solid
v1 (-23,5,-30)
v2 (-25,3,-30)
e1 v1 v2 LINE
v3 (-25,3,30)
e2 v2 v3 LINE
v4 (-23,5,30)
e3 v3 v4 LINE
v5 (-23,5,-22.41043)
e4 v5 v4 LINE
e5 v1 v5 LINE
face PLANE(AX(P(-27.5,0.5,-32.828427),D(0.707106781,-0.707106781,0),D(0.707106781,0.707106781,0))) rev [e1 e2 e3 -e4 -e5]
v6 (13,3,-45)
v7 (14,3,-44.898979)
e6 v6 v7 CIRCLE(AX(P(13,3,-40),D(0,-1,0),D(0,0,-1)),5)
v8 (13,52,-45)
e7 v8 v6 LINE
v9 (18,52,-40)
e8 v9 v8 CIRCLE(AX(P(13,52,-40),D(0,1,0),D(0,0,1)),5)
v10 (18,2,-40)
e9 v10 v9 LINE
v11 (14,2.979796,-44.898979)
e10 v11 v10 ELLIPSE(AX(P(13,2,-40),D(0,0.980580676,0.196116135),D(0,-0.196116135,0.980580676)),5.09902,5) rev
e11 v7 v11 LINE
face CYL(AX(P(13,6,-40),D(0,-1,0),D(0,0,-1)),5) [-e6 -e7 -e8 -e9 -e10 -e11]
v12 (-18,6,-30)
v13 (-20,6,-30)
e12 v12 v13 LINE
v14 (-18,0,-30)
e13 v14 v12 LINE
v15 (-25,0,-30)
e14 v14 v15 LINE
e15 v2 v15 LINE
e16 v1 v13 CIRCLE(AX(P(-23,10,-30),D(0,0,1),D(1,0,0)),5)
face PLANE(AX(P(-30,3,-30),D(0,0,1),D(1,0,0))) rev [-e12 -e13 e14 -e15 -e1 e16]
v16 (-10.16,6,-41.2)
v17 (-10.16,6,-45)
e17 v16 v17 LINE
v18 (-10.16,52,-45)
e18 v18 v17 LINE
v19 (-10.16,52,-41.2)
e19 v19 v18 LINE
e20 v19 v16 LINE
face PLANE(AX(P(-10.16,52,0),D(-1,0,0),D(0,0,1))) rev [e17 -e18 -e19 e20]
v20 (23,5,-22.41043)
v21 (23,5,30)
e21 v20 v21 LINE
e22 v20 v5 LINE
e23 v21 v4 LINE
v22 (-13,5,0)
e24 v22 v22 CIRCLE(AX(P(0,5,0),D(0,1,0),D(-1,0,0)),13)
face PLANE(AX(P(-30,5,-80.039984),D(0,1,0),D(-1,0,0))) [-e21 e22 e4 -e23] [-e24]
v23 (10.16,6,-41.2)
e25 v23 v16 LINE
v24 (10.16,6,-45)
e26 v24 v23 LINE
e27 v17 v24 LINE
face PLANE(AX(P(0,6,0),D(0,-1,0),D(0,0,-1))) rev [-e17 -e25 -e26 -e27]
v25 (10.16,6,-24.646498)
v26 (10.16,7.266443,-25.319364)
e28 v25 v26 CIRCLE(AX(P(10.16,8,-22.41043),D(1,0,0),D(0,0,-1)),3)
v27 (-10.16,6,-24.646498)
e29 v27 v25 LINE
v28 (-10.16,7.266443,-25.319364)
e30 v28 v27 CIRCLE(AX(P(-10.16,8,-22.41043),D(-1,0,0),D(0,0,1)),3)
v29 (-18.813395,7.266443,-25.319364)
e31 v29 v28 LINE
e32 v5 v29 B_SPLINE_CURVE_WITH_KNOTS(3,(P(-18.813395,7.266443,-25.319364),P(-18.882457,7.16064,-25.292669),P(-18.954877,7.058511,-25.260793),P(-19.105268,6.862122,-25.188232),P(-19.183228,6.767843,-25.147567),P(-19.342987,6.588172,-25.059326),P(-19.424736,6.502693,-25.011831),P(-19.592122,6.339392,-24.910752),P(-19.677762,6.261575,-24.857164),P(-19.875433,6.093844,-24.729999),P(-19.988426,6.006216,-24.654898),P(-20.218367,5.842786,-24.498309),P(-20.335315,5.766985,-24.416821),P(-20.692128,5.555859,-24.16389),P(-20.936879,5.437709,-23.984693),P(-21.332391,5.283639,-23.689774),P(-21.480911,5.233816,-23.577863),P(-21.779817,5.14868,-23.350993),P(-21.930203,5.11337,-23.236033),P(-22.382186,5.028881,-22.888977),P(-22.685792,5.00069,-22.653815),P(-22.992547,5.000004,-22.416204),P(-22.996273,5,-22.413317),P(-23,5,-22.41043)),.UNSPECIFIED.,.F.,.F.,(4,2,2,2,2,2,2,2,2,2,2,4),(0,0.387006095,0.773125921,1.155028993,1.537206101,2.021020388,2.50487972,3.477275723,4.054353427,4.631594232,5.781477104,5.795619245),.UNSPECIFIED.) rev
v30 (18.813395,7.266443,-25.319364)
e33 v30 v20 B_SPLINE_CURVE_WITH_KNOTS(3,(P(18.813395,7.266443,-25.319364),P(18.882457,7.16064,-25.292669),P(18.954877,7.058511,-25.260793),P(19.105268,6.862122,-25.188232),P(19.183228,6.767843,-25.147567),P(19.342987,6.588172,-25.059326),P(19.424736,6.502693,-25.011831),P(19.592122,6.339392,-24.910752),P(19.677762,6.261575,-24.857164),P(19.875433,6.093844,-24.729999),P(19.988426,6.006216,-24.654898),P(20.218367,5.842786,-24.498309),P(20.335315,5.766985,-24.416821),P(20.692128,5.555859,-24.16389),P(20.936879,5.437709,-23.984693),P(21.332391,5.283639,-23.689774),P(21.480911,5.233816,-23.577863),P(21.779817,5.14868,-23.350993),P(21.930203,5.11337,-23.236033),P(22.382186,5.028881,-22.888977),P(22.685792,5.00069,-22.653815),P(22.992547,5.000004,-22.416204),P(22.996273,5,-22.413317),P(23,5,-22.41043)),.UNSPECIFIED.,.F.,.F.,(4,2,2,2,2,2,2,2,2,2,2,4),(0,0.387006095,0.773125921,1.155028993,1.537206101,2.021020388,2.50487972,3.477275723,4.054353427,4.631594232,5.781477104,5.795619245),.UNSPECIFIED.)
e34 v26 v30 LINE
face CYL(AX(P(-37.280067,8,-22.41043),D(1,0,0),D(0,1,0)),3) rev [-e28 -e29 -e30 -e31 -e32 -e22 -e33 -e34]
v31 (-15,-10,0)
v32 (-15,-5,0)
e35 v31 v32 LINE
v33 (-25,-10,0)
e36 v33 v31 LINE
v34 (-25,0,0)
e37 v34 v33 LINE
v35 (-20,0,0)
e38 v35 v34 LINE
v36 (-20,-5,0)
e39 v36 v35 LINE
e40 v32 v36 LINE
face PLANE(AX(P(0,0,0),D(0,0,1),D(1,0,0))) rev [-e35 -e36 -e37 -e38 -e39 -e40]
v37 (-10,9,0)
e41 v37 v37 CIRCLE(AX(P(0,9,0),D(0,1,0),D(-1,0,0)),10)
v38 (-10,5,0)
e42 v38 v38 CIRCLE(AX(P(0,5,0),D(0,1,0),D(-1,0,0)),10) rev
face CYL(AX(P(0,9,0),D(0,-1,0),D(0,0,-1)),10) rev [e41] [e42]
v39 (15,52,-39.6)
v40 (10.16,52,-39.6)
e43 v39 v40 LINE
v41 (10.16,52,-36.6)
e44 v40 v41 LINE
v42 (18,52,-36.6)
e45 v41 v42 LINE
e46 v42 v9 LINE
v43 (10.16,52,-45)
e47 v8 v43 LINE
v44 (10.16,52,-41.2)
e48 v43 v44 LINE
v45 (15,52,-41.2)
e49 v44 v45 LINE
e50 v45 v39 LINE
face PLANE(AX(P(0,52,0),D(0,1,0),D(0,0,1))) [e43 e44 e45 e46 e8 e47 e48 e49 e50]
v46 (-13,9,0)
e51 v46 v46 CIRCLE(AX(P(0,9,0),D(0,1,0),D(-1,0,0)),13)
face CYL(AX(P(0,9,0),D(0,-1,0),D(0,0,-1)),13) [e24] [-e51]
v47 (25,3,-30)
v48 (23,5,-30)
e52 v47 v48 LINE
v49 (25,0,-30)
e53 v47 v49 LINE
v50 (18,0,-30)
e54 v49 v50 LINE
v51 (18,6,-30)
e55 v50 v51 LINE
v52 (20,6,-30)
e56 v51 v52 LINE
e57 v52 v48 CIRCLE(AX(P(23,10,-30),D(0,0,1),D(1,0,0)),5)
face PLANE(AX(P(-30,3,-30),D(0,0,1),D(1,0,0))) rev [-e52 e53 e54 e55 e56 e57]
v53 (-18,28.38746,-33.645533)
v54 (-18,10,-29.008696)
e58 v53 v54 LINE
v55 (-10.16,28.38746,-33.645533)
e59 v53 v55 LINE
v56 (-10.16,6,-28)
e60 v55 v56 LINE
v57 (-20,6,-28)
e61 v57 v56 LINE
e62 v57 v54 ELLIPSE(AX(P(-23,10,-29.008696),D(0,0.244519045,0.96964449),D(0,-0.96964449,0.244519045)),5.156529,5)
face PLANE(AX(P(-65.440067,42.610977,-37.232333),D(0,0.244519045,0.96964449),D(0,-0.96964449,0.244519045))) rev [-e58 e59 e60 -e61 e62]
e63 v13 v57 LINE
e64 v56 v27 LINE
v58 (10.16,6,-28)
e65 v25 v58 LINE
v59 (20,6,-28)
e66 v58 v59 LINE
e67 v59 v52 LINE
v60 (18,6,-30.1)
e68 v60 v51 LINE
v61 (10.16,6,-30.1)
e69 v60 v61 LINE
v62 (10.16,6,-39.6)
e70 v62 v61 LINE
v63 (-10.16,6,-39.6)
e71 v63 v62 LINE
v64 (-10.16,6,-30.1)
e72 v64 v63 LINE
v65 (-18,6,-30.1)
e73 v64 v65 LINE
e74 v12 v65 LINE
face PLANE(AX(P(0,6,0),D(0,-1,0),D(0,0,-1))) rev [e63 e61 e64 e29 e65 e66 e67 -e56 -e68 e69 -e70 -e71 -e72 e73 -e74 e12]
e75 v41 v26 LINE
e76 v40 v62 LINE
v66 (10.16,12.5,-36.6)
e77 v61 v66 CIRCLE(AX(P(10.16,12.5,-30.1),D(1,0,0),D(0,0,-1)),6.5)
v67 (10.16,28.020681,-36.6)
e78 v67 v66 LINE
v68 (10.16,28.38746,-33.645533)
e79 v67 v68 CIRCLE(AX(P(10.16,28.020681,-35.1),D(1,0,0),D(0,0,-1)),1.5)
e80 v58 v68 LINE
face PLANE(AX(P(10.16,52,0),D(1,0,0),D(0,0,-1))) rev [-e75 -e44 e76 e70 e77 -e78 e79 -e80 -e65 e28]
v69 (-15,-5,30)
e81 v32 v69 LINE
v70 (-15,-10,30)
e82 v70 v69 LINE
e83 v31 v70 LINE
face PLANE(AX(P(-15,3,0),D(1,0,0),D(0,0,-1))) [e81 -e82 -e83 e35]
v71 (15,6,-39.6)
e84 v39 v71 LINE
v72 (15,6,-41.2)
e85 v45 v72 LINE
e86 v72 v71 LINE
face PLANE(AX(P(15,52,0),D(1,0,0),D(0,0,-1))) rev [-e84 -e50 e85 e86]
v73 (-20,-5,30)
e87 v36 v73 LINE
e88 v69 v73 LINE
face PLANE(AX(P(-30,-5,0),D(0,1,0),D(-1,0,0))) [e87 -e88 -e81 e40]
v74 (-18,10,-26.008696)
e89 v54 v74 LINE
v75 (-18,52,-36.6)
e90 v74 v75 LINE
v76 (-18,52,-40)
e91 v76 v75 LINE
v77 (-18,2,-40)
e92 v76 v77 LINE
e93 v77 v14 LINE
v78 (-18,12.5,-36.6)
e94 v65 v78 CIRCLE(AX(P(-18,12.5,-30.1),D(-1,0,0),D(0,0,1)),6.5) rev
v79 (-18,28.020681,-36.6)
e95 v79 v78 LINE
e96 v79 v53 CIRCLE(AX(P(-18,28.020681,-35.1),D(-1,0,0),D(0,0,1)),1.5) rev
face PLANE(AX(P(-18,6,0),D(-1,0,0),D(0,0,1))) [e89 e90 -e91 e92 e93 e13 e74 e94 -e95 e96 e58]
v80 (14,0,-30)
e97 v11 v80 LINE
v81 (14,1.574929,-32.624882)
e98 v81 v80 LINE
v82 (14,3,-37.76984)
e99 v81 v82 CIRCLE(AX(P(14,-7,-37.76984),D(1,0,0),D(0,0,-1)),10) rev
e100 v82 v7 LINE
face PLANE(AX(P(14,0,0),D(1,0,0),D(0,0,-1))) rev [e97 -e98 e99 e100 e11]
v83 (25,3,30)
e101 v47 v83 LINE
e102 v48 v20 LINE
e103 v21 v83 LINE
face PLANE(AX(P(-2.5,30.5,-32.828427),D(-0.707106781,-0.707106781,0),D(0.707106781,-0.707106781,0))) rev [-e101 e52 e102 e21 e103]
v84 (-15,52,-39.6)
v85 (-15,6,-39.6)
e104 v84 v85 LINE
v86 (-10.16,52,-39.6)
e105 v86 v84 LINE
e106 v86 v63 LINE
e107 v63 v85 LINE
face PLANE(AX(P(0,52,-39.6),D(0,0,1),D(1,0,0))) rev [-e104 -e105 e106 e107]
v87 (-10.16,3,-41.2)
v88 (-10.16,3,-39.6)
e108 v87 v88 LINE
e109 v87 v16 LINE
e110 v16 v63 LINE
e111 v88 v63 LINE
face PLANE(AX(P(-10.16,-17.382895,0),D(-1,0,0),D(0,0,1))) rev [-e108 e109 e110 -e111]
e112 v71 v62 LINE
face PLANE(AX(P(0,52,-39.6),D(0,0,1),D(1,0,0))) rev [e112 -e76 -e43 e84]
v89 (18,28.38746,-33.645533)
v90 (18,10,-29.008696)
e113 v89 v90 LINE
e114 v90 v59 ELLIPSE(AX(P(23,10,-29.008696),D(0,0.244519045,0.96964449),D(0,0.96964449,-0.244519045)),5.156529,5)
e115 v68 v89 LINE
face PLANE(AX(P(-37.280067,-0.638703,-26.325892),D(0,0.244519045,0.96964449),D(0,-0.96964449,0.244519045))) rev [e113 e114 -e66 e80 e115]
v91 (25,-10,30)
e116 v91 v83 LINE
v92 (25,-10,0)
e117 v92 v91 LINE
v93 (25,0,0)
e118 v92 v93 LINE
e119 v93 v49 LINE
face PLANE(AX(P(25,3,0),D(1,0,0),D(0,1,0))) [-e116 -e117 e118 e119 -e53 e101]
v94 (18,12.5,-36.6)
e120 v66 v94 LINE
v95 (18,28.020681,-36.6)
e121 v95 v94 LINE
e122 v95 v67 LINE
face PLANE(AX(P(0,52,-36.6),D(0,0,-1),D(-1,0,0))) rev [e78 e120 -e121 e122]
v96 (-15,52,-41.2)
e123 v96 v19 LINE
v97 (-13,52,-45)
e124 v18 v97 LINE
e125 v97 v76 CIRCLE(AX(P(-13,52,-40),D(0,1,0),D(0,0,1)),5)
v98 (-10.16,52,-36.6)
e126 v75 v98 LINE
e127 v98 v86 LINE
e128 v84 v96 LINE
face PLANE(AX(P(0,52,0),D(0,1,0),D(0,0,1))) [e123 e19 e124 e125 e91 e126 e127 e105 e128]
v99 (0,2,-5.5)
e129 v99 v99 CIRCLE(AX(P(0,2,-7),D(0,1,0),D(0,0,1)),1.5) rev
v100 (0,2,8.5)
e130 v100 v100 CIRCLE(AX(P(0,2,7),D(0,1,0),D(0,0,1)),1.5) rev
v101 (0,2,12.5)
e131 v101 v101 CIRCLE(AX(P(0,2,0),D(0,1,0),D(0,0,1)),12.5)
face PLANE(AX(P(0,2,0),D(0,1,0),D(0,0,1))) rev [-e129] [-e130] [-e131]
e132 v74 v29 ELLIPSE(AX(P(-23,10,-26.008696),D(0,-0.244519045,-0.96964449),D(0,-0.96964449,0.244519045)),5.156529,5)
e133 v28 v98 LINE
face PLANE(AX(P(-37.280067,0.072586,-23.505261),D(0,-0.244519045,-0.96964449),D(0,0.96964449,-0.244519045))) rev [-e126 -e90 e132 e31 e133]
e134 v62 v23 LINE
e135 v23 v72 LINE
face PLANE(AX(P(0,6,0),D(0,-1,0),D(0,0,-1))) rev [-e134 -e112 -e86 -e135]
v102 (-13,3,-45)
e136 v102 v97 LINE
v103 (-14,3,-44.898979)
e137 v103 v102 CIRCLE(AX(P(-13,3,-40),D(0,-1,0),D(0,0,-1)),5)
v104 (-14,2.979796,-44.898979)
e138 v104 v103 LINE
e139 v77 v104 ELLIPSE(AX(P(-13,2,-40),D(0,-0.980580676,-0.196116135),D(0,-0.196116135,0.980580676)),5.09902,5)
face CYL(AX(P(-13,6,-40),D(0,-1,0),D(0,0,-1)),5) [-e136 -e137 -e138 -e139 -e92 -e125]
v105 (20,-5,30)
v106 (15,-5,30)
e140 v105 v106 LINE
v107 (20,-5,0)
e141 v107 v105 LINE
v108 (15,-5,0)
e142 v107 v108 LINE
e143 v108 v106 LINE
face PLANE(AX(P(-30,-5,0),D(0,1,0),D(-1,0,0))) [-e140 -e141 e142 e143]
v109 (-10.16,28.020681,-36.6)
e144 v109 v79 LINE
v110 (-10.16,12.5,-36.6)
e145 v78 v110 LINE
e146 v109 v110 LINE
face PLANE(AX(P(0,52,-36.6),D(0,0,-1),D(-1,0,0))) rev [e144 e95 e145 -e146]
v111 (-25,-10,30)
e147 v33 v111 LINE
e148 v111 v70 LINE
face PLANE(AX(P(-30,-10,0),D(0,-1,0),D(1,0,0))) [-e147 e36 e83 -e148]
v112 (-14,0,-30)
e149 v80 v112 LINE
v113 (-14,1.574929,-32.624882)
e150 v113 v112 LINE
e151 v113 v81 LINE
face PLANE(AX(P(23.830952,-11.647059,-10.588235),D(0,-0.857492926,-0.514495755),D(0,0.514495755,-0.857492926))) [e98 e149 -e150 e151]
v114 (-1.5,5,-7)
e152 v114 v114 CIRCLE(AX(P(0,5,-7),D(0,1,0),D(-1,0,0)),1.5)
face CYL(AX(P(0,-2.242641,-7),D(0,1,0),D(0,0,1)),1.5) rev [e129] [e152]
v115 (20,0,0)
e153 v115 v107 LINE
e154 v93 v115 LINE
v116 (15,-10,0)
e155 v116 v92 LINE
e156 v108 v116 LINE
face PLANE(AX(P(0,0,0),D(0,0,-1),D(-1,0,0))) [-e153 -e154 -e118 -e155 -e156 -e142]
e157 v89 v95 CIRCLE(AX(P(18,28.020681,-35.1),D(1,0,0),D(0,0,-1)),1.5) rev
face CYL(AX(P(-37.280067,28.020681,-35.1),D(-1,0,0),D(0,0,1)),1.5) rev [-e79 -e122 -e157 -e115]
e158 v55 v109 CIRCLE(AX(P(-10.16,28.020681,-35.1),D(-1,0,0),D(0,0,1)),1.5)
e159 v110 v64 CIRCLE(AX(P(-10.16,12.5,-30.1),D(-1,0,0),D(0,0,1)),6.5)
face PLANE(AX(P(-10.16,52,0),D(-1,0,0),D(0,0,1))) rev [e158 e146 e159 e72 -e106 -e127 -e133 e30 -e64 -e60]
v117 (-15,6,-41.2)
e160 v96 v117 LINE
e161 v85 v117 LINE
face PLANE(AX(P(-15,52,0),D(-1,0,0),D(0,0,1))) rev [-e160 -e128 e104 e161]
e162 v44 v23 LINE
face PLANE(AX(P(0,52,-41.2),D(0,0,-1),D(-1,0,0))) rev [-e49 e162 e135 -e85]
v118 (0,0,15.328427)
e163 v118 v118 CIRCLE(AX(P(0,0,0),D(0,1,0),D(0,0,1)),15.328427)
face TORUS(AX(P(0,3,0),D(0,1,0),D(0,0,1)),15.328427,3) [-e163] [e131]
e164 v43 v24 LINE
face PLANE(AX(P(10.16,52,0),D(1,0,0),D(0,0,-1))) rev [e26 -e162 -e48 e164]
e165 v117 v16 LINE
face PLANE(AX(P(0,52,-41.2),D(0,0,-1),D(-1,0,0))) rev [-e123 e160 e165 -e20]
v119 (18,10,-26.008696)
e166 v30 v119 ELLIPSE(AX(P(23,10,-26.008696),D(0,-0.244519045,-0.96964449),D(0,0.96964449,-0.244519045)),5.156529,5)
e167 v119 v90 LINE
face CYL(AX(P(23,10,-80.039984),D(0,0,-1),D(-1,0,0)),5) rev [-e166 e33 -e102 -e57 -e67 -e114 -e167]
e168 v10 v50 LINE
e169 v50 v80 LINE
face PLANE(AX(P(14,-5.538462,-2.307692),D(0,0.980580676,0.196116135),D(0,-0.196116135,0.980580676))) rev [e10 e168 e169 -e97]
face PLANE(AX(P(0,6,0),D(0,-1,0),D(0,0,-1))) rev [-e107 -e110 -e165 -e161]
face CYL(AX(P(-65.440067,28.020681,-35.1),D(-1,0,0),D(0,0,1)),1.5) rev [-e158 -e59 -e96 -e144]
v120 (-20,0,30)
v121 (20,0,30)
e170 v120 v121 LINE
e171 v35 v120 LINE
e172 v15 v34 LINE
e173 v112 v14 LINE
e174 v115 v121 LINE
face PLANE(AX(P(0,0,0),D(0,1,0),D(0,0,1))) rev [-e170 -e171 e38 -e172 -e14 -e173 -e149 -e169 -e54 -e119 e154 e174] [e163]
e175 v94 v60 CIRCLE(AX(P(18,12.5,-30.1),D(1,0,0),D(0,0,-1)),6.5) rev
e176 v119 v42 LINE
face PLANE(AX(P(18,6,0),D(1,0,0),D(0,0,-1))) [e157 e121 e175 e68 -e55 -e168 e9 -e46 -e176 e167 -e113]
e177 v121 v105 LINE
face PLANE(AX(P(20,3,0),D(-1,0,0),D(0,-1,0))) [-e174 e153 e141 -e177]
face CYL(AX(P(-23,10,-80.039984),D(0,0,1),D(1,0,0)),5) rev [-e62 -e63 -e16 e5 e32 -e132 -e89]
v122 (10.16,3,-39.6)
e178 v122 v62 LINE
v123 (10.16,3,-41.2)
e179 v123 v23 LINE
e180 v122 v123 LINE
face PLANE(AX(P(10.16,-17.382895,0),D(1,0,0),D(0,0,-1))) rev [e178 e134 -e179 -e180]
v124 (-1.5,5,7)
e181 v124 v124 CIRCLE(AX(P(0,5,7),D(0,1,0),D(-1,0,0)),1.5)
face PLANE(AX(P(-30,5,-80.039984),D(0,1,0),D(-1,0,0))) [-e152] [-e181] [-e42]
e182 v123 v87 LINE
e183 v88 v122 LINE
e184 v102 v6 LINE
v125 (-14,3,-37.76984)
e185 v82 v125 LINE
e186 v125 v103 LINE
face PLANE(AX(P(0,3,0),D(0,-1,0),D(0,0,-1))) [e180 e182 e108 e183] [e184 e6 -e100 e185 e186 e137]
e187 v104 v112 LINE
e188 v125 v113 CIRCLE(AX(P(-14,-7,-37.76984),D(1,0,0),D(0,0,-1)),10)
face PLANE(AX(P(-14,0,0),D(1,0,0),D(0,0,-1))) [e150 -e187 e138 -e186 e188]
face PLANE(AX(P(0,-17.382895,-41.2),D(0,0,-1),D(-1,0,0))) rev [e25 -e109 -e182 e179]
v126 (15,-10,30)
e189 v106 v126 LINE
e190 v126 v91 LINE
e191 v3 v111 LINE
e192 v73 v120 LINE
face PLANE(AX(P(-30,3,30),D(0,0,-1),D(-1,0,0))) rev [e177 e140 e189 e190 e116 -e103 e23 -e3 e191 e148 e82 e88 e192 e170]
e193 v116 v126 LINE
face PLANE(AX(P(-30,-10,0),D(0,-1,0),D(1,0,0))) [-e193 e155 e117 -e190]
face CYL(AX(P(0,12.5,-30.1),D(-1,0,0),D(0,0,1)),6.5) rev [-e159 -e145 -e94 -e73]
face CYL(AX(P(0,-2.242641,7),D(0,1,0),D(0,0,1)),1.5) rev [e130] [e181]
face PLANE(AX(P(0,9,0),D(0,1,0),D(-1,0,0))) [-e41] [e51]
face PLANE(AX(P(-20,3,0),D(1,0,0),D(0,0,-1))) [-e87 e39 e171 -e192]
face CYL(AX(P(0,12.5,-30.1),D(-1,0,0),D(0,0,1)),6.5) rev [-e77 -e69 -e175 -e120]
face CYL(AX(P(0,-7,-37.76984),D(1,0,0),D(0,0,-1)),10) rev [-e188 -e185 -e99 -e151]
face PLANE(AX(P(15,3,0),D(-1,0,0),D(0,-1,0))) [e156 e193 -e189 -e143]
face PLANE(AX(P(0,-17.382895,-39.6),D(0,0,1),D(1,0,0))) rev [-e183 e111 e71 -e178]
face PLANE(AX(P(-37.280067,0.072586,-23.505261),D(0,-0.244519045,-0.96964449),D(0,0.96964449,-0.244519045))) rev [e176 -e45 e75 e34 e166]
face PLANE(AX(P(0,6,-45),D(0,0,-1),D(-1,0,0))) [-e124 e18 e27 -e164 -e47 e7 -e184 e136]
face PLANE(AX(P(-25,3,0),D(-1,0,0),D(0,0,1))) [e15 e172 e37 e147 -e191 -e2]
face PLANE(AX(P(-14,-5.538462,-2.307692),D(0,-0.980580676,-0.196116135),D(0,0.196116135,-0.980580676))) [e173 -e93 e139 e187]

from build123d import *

# Parameters (mm, degrees)
SKETCH_2_W          = 60
SKETCH_2_H          = 60
EXTRUDE_1_DEPTH     = 3
EXTRUDE_START       = 30
EXTRUDE_3_DEPTH     = 30
EXTRUDE_START_2     = 3
SKETCH_8_W          = 36
SKETCH_8_H          = 20
EXTRUDE_4_DEPTH     = 3
CUT_EXTRUDE_START   = 6
SKETCH_10_W         = 20.32
SKETCH_10_H         = 1.6
CUT_EXTRUDE_2_DEPTH = 3
EXTRUDE_START_3     = 6
EXTRUDE_5_DEPTH     = 46
EXTRUDE_START_4     = -18
EXTRUDE_6_DEPTH     = 36
EXTRUDE_START_5     = 18
EXTRUDE_8_DEPTH     = 7.84
EXTRUDE_START_6     = -10.16
EXTRUDE_9_DEPTH     = 7.84
EXTRUDE_10_DEPTH    = 36
SKETCH_16_W         = 5
SKETCH_16_H         = 60
CUT_EXTRUDE_3_DEPTH = 3
EXTRUDE_11_DEPTH    = 4
EXTRUDE_12_DEPTH    = 4
FILLET_3_R          = 5
FILLET_4_R          = 10
SKETCH_22_W         = 50
SKETCH_22_H         = 2
EXTRUDE_14_DEPTH    = 60
CUT_EXTRUDE_START_2 = 30
CUT_EXTRUDE_4_DEPTH = 60
SKETCH_26_R         = 12.5
CUT_EXTRUDE_6_DEPTH = 2
FILLET_5_R          = 3
FILLET_7_R          = 5
FILLET_8_R          = 6.5
FILLET_9_R          = 1.5
FILLET_10_R         = 3
CUT_EXTRUDE_START_3 = 5
SKETCH_27_R         = 1.5
CUT_EXTRUDE_7_DEPTH = 3
EXTRUDE_START_7     = 5
SKETCH_28_R         = 13
SKETCH_28_R_2       = 10
EXTRUDE_15_DEPTH    = 4


with BuildPart() as part:
    # 草图2 → 凸台-拉伸1 (new body)
    with BuildSketch(Plane(origin=(0, 0, 0), x_dir=(1, 0, 0), z_dir=(0, 1, 0))):
        Rectangle(SKETCH_2_W, SKETCH_2_H)
    extrude(amount=EXTRUDE_1_DEPTH)

    # 草图7 → 凸台-拉伸3 (add)
    with BuildSketch(Plane.XY.offset(EXTRUDE_START)):
        Polygon((-25, 0), (-25, -10), (-15, -10), (-15, -5), (-20, -5), (-20, 0), align=None)
        Polygon((20, 0), (25, 0), (25, -10), (15, -10), (15, -5), (20, -5), align=None)
    extrude(amount=-EXTRUDE_3_DEPTH)

    # 草图8 → 凸台-拉伸4 (add)
    with BuildSketch(Plane(origin=(0, 0, 0), x_dir=(1, 0, 0), z_dir=(0, 1, 0)).offset(EXTRUDE_START_2)):
        with Locations((0, 35)):
            Rectangle(SKETCH_8_W, SKETCH_8_H)
    extrude(amount=EXTRUDE_4_DEPTH)

    # 草图10 → 切除-拉伸2 (cut)
    with BuildSketch(Plane(origin=(0, 0, 0), x_dir=(1, 0, 0), z_dir=(0, 1, 0)).offset(CUT_EXTRUDE_START)):
        with Locations((0, 40.4)):
            Rectangle(SKETCH_10_W, SKETCH_10_H)
    extrude(amount=-CUT_EXTRUDE_2_DEPTH, mode=Mode.SUBTRACT)

    # 草图11 → 凸台-拉伸5 (add)
    with BuildSketch(Plane(origin=(0, 0, 0), x_dir=(1, 0, 0), z_dir=(0, 1, 0)).offset(EXTRUDE_START_3)):
        Polygon((10.16, 41.2), (10.16, 45), (18, 45), (18, 36.6), (10.16, 36.6), (10.16, 39.6), (15, 39.6), (15, 41.2), align=None)
        Polygon((-15, 41.2), (-15, 39.6), (-10.16, 39.6), (-10.16, 36.6), (-18, 36.6), (-18, 45), (-10.16, 45), (-10.16, 41.2), align=None)
    extrude(amount=EXTRUDE_5_DEPTH)

    # 草图12 → 凸台-拉伸6 (add)
    with BuildSketch(Plane(origin=(0, 0, 0), x_dir=(0, 0, -1), z_dir=(1, 0, 0)).offset(EXTRUDE_START_4)):
        Polygon((30, 0), (35, 3), (30, 3), align=None)
    extrude(amount=EXTRUDE_6_DEPTH)

    # 草图13 → 凸台-拉伸8 (add)
    with BuildSketch(Plane(origin=(0, 0, 0), x_dir=(0, 0, -1), z_dir=(1, 0, 0)).offset(EXTRUDE_START_5)):
        Polygon((25, 6), (36.6, 52), (36.6, 40.103448276), (28, 6), align=None)
    extrude(amount=-EXTRUDE_8_DEPTH)

    # 草图14 → 凸台-拉伸9 (add)
    with BuildSketch(Plane(origin=(0, 0, 0), x_dir=(0, 0, -1), z_dir=(1, 0, 0)).offset(EXTRUDE_START_6)):
        Polygon((36.6, 52), (25, 6), (28, 6), (36.6, 40.103448276), align=None)
    extrude(amount=-EXTRUDE_9_DEPTH)

    # 草图15 → 凸台-拉伸10 (add)
    with BuildSketch(Plane(origin=(0, 0, 0), x_dir=(0, 0, -1), z_dir=(1, 0, 0)).offset(EXTRUDE_START_4)):
        Polygon((25, 3), (24.243478261, 3), (25, 6), align=None)
    extrude(amount=EXTRUDE_10_DEPTH)

    # 草图16 → 切除-拉伸3 (cut)
    with BuildSketch(Plane(origin=(0, 0, 0), x_dir=(1, 0, 0), z_dir=(0, 1, 0))):
        with Locations((27.5, 0)):
            Rectangle(SKETCH_16_W, SKETCH_16_H)
        with Locations((-27.5, 0)):
            Rectangle(SKETCH_16_W, SKETCH_16_H)
    extrude(amount=CUT_EXTRUDE_3_DEPTH, mode=Mode.SUBTRACT)

    # 草图17 → 凸台-拉伸11 (add)
    with BuildSketch(Plane(origin=(0, 0, 0), x_dir=(0, 0, -1), z_dir=(1, 0, 0)).offset(EXTRUDE_START_5)):
        Polygon((30, 0), (45, 3), (30, 3), align=None)
    extrude(amount=-EXTRUDE_11_DEPTH)

    # 草图18 → 凸台-拉伸12 (add)
    with BuildSketch(Plane(origin=(0, 0, 0), x_dir=(0, 0, -1), z_dir=(1, 0, 0)).offset(EXTRUDE_START_4)):
        Polygon((30, 0), (30, 3), (45, 3), align=None)
    extrude(amount=EXTRUDE_12_DEPTH)

    # 圆角3
    # the kernel refuses this fillet: 5 mm, written as the material it takes off along each edge
    with BuildSketch(Plane(origin=(18, -9.5, -45), x_dir=(0, 0, 1), z_dir=(0, 1, 0)), Plane(origin=(-18, 64.5, -45), x_dir=(0, 0, 1), z_dir=(0, -1, 0))) as fillet_3_piece_1:
        with BuildLine():
            CenterArc((FILLET_3_R, -FILLET_3_R), FILLET_3_R, 90, 90)
            Line((0, -FILLET_3_R), (0, 0))
            Line((0, 0), (FILLET_3_R, 0))
        make_face()
    extrude(amount=74, mode=Mode.SUBTRACT)

    # 圆角4
    fillet_4_edges = [part.edges().sort_by_distance(p)[0] for p in [
        (0, 3, -35),
    ]]
    fillet(fillet_4_edges, radius=FILLET_4_R)

    # 草图22 → 凸台-拉伸14 (add)
    with BuildSketch(Plane.XY.offset(EXTRUDE_START)):
        with Locations((0, 4)):
            Rectangle(SKETCH_22_W, SKETCH_22_H)
    extrude(amount=-EXTRUDE_14_DEPTH)

    # 草图24 → 切除-拉伸4 (cut)
    with BuildSketch(Plane.XY.offset(CUT_EXTRUDE_START_2)):
        Polygon((-25, 5), (-23, 5), (-25, 3), align=None)
        Polygon((25, 5), (25, 3), (23, 5), align=None)
    extrude(amount=-CUT_EXTRUDE_4_DEPTH, mode=Mode.SUBTRACT)

    # 草图26 → 切除-拉伸6 (cut)
    with BuildSketch(Plane(origin=(0, 0, 0), x_dir=(1, 0, 0), z_dir=(0, 1, 0))):
        with Locations(Location((0, 0, 0), (0, 0, 270))):
            Circle(SKETCH_26_R)
    extrude(amount=CUT_EXTRUDE_6_DEPTH, mode=Mode.SUBTRACT)

    # 圆角5
    # the kernel refuses this fillet: 3 mm, written as the material it takes off along each edge
    with BuildSketch(Plane(origin=(0, 0, 0), x_dir=(0, 0, 1), z_dir=(-1, 0, 0))) as fillet_5_piece_1:
        with BuildLine():
            CenterArc((15.328427125, 3), FILLET_5_R, 199.471220634, 70.528779366)
            Line((12.5, 2), (12.443431458, 1.98))
            ThreePointArc((12.443431458, 1.98), (12.44, 1), (12.44, 0))
            Line((12.44, 0), (12.5, -0.06))
            Line((12.5, -0.06), (15.328427125, -0.06))
            Line((15.328427125, -0.06), (15.328427125, 0))
        make_face()
    revolve(axis=Axis((0, 0, 0), (0, 1, 0)), mode=Mode.SUBTRACT)

    # 圆角7
    # the kernel refuses this fillet: 5 mm, written as the material it adds along each edge
    with BuildSketch(Plane(origin=(-18, 5, -12.247826087), x_dir=(0, 1, 0), z_dir=(0, 0, -1))) as fillet_7_piece_1_section:
        with BuildLine():
            CenterArc((FILLET_7_R, -FILLET_7_R), FILLET_7_R, 90, 90)
            Line((0, -FILLET_7_R), (0, 0))
            Line((0, 0), (FILLET_7_R, 0))
        make_face()
    fillet_7_piece_1 = extrude(amount=30.252173913, mode=Mode.PRIVATE)
    fillet_7_piece_1 = split(fillet_7_piece_1, bisect_by=Plane(origin=(-18.571810287, 7.311264389, -25.330666672), z_dir=(0, -0.24451904524274018, -0.9696444897556934)), keep=Keep.TOP, mode=Mode.PRIVATE)
    fillet_7_piece_1 = split(fillet_7_piece_1, bisect_by=Plane(origin=(-18.571810287, 6.599974755, -28.151297982), z_dir=(0, 0.24451904524274015, 0.9696444897556934)), keep=Keep.TOP, mode=Mode.PRIVATE)
    add(fillet_7_piece_1)
    with BuildSketch(Plane(origin=(-18, 5, -12.247826087), x_dir=(0, 1, 0), z_dir=(0, 0, -1))) as fillet_7_piece_2_section:
        with BuildLine():
            CenterArc((FILLET_7_R, -FILLET_7_R), FILLET_7_R, 90, 90)
            Line((0, -FILLET_7_R), (0, 0))
            Line((0, 0), (FILLET_7_R, 0))
        make_face()
    fillet_7_piece_2 = extrude(amount=17.752173913, mode=Mode.PRIVATE)
    fillet_7_piece_2 = split(fillet_7_piece_2, bisect_by=Plane(origin=(-19.572975188, 6, -28.927333211), z_dir=(0, -1, 0)), keep=Keep.TOP, mode=Mode.PRIVATE)
    fillet_7_piece_2 = split(fillet_7_piece_2, bisect_by=Plane(origin=(-19.572975188, 5.678002788, -27.918800703), z_dir=(0, -0.24451904524274015, -0.9696444897556934)), keep=Keep.TOP, mode=Mode.PRIVATE)
    add(fillet_7_piece_2)
    with BuildSketch(Plane(origin=(18, 5, -30), x_dir=(1, 0, 0), z_dir=(0, 0, 1))) as fillet_7_piece_3_section:
        with BuildLine():
            CenterArc((FILLET_7_R, FILLET_7_R), FILLET_7_R, 180, 90)
            Line((0, FILLET_7_R), (0, 0))
            Line((0, 0), (FILLET_7_R, 0))
        make_face()
    fillet_7_piece_3 = extrude(amount=17.752173913, mode=Mode.PRIVATE)
    fillet_7_piece_3 = split(fillet_7_piece_3, bisect_by=Plane(origin=(19.572975189, 6, -28.92733321), z_dir=(0, -1, 0)), keep=Keep.TOP, mode=Mode.PRIVATE)
    fillet_7_piece_3 = split(fillet_7_piece_3, bisect_by=Plane(origin=(19.572975189, 6.389292423, -25.098169394), z_dir=(0, -0.24451904524274018, -0.9696444897556934)), keep=Keep.TOP, mode=Mode.PRIVATE)
    add(fillet_7_piece_3)
    with BuildSketch(Plane(origin=(18, 5, -42.5), x_dir=(1, 0, 0), z_dir=(0, 0, 1))) as fillet_7_piece_4_section:
        with BuildLine():
            CenterArc((FILLET_7_R, FILLET_7_R), FILLET_7_R, 180, 90)
            Line((0, FILLET_7_R), (0, 0))
            Line((0, 0), (FILLET_7_R, 0))
        make_face()
    fillet_7_piece_4 = extrude(amount=30.252173913, mode=Mode.PRIVATE)
    fillet_7_piece_4 = split(fillet_7_piece_4, bisect_by=Plane(origin=(18.571810287, 7.311264389, -25.330666672), z_dir=(0, -0.24451904524274018, -0.9696444897556934)), keep=Keep.TOP, mode=Mode.PRIVATE)
    fillet_7_piece_4 = split(fillet_7_piece_4, bisect_by=Plane(origin=(18.571810287, 6.599974754, -28.151297982), z_dir=(0, 0.24451904524274015, 0.9696444897556934)), keep=Keep.TOP, mode=Mode.PRIVATE)
    add(fillet_7_piece_4)

    # 圆角8
    fillet_8_edges = [part.edges().sort_by_distance(p)[0] for p in [
        (14.08, 6, -36.6),
        (-14.08, 6, -36.6),
    ]]
    fillet(fillet_8_edges, radius=FILLET_8_R)

    # 圆角9
    fillet_9_edges = [part.edges().sort_by_distance(p)[0] for p in [
        (14.08, 40.103448276, -36.6),
        (-14.08, 40.103448276, -36.6),
    ]]
    fillet(fillet_9_edges, radius=FILLET_9_R)

    # 圆角10
    # the kernel refuses this fillet: 3 mm, written as the material it adds along each edge
    with BuildSketch(Plane(origin=(-28.843489259, 5, -24.747826087), x_dir=(-2.8138525512499648e-15, 0.9696444897556498, -0.24451904524291254), z_dir=(1, 0, 0))) as fillet_10_piece_1_section:
        with BuildLine():
            CenterArc((FILLET_10_R * 0.779131901165, FILLET_10_R), FILLET_10_R, 194.153412588, 75.846587412)
            Line((-FILLET_10_R * 0.190512588591, FILLET_10_R * 0.755480954757), (0, 0))
            Line((0, 0), (FILLET_10_R * 0.779131901165, 0))
        make_face()
    fillet_10_piece_1 = extrude(amount=57.686978517, mode=Mode.PRIVATE)
    fillet_10_piece_1 = split(fillet_10_piece_1, bisect_by=Plane(origin=(-15.866529779, 6, -24.192724601), z_dir=(0, -1, 0)), keep=Keep.TOP, mode=Mode.PRIVATE)
    fillet_10_piece_1 = fillet_10_piece_1 - Plane(origin=(-23, 10, -24.192724601), x_dir=(0, 1, 0), z_dir=(0, 0, 1)) * Cylinder(5, 125, mode=Mode.PRIVATE)
    fillet_10_piece_1 = split(fillet_10_piece_1, bisect_by=Plane(origin=(-10.16, 5.299241574, -24.192724601), z_dir=(-1, 0, 0)), keep=Keep.TOP, mode=Mode.PRIVATE)
    fillet_10_piece_1 = split(fillet_10_piece_1, bisect_by=Plane(origin=(-19.283644102, 8.716355898, -24.192724601), z_dir=(0.7071067811865488, -0.7071067811865462, 0)), keep=Keep.TOP, mode=Mode.PRIVATE)
    add(fillet_10_piece_1)
    with BuildSketch(Plane(origin=(-28.843489259, 5, -24.747826087), x_dir=(-2.8138525512499648e-15, 0.9696444897556498, -0.24451904524291254), z_dir=(1, 0, 0))) as fillet_10_piece_2_section:
        with BuildLine():
            CenterArc((FILLET_10_R * 0.779131901165, FILLET_10_R), FILLET_10_R, 194.153412588, 75.846587412)
            Line((-FILLET_10_R * 0.190512588591, FILLET_10_R * 0.755480954757), (0, 0))
            Line((0, 0), (FILLET_10_R * 0.779131901165, 0))
        make_face()
    fillet_10_piece_2 = extrude(amount=57.686978517, mode=Mode.PRIVATE)
    fillet_10_piece_2 = split(fillet_10_piece_2, bisect_by=Plane(origin=(-14.854595225, 6, -25.046116775), z_dir=(0, 1, 0)), keep=Keep.TOP, mode=Mode.PRIVATE)
    fillet_10_piece_2 = fillet_10_piece_2 - Plane(origin=(-23, 10, -25.046116775), x_dir=(0, 1, 0), z_dir=(0, 0, 1)) * Cylinder(5, 125, mode=Mode.PRIVATE)
    fillet_10_piece_2 = split(fillet_10_piece_2, bisect_by=Plane(origin=(-10.16, 6.410540932, -25.046116775), z_dir=(-1, 0, 0)), keep=Keep.TOP, mode=Mode.PRIVATE)
    fillet_10_piece_2 = split(fillet_10_piece_2, bisect_by=Plane(origin=(-18.222027147, 9.777972853, -25.046116775), z_dir=(0.7071067811865488, -0.7071067811865462, 0)), keep=Keep.TOP, mode=Mode.PRIVATE)
    add(fillet_10_piece_2)
    with BuildSketch(Plane(origin=(-28.843489259, 5, -24.747826087), x_dir=(-2.8138525512499648e-15, 0.9696444897556498, -0.24451904524291254), z_dir=(1, 0, 0))) as fillet_10_piece_3_section:
        with BuildLine():
            CenterArc((FILLET_10_R * 0.779131901165, FILLET_10_R), FILLET_10_R, 194.153412588, 75.846587412)
            Line((-FILLET_10_R * 0.190512588591, FILLET_10_R * 0.755480954757), (0, 0))
            Line((0, 0), (FILLET_10_R * 0.779131901165, 0))
        make_face()
    fillet_10_piece_3 = extrude(amount=57.686978517, mode=Mode.PRIVATE)
    fillet_10_piece_3 = split(fillet_10_piece_3, bisect_by=Plane(origin=(0, 6, -24.222418931), z_dir=(0, -1, 0)), keep=Keep.TOP, mode=Mode.PRIVATE)
    fillet_10_piece_3 = split(fillet_10_piece_3, bisect_by=Plane(origin=(-10.16, 5.321349944, -24.222418931), z_dir=(1, 0, 0)), keep=Keep.TOP, mode=Mode.PRIVATE)
    fillet_10_piece_3 = split(fillet_10_piece_3, bisect_by=Plane(origin=(10.16, 5.321349944, -24.222418931), z_dir=(-1, 0, 0)), keep=Keep.TOP, mode=Mode.PRIVATE)
    add(fillet_10_piece_3)
    with BuildSketch(Plane(origin=(-28.843489259, 5, -24.747826087), x_dir=(-2.8138525512499648e-15, 0.9696444897556498, -0.24451904524291254), z_dir=(1, 0, 0))) as fillet_10_piece_4_section:
        with BuildLine():
            CenterArc((FILLET_10_R * 0.779131901165, FILLET_10_R), FILLET_10_R, 194.153412588, 75.846587412)
            Line((-FILLET_10_R * 0.190512588591, FILLET_10_R * 0.755480954757), (0, 0))
            Line((0, 0), (FILLET_10_R * 0.779131901165, 0))
        make_face()
    fillet_10_piece_4 = extrude(amount=57.686978517, mode=Mode.PRIVATE)
    fillet_10_piece_4 = split(fillet_10_piece_4, bisect_by=Plane(origin=(15.866529778, 6, -24.192724601), z_dir=(0, -1, 0)), keep=Keep.TOP, mode=Mode.PRIVATE)
    fillet_10_piece_4 = fillet_10_piece_4 - Plane(origin=(23, 10, -24.192724601), x_dir=(1, 0, 0), z_dir=(0, 0, -1)) * Cylinder(5, 125, mode=Mode.PRIVATE)
    fillet_10_piece_4 = split(fillet_10_piece_4, bisect_by=Plane(origin=(10.16, 5.299241574, -24.192724601), z_dir=(1, 0, 0)), keep=Keep.TOP, mode=Mode.PRIVATE)
    fillet_10_piece_4 = split(fillet_10_piece_4, bisect_by=Plane(origin=(19.283644102, 8.716355898, -24.192724601), z_dir=(-0.7071067811865306, -0.7071067811865644, 0)), keep=Keep.TOP, mode=Mode.PRIVATE)
    add(fillet_10_piece_4)
    with BuildSketch(Plane(origin=(-28.843489259, 5, -24.747826087), x_dir=(-2.8138525512499648e-15, 0.9696444897556498, -0.24451904524291254), z_dir=(1, 0, 0))) as fillet_10_piece_5_section:
        with BuildLine():
            CenterArc((FILLET_10_R * 0.779131901165, FILLET_10_R), FILLET_10_R, 194.153412588, 75.846587412)
            Line((-FILLET_10_R * 0.190512588591, FILLET_10_R * 0.755480954757), (0, 0))
            Line((0, 0), (FILLET_10_R * 0.779131901165, 0))
        make_face()
    fillet_10_piece_5 = extrude(amount=57.686978517, mode=Mode.PRIVATE)
    fillet_10_piece_5 = split(fillet_10_piece_5, bisect_by=Plane(origin=(14.854595225, 6, -25.046116775), z_dir=(0, 1, 0)), keep=Keep.TOP, mode=Mode.PRIVATE)
    fillet_10_piece_5 = fillet_10_piece_5 - Plane(origin=(23, 10, -25.046116775), x_dir=(1, 0, 0), z_dir=(0, 0, -1)) * Cylinder(5, 125, mode=Mode.PRIVATE)
    fillet_10_piece_5 = split(fillet_10_piece_5, bisect_by=Plane(origin=(10.16, 6.410540932, -25.046116775), z_dir=(1, 0, 0)), keep=Keep.TOP, mode=Mode.PRIVATE)
    fillet_10_piece_5 = split(fillet_10_piece_5, bisect_by=Plane(origin=(18.222027147, 9.777972853, -25.046116775), z_dir=(-0.7071067811865306, -0.7071067811865644, 0)), keep=Keep.TOP, mode=Mode.PRIVATE)
    add(fillet_10_piece_5)

    # 草图27 → 切除-拉伸7 (cut)
    with BuildSketch(Plane(origin=(0, 0, 0), x_dir=(1, 0, 0), z_dir=(0, 1, 0)).offset(CUT_EXTRUDE_START_3)):
        with Locations(Location((0, 7, 0), (0, 0, 270))):
            Circle(SKETCH_27_R)
        with Locations(Location((0, -7, 0), (0, 0, 270))):
            Circle(SKETCH_27_R)
    extrude(amount=-CUT_EXTRUDE_7_DEPTH, mode=Mode.SUBTRACT)

    # 草图28 → 凸台-拉伸15 (add)
    with BuildSketch(Plane(origin=(0, 0, 0), x_dir=(1, 0, 0), z_dir=(0, 1, 0)).offset(EXTRUDE_START_7)):
        with Locations(Location((0, 0, 0), (0, 0, 180))):
            Circle(SKETCH_28_R)
        with Locations(Location((0, 0, 0), (0, 0, 180))):
            Circle(SKETCH_28_R_2, mode=Mode.SUBTRACT)
    extrude(amount=EXTRUDE_15_DEPTH)


solid = part.part
